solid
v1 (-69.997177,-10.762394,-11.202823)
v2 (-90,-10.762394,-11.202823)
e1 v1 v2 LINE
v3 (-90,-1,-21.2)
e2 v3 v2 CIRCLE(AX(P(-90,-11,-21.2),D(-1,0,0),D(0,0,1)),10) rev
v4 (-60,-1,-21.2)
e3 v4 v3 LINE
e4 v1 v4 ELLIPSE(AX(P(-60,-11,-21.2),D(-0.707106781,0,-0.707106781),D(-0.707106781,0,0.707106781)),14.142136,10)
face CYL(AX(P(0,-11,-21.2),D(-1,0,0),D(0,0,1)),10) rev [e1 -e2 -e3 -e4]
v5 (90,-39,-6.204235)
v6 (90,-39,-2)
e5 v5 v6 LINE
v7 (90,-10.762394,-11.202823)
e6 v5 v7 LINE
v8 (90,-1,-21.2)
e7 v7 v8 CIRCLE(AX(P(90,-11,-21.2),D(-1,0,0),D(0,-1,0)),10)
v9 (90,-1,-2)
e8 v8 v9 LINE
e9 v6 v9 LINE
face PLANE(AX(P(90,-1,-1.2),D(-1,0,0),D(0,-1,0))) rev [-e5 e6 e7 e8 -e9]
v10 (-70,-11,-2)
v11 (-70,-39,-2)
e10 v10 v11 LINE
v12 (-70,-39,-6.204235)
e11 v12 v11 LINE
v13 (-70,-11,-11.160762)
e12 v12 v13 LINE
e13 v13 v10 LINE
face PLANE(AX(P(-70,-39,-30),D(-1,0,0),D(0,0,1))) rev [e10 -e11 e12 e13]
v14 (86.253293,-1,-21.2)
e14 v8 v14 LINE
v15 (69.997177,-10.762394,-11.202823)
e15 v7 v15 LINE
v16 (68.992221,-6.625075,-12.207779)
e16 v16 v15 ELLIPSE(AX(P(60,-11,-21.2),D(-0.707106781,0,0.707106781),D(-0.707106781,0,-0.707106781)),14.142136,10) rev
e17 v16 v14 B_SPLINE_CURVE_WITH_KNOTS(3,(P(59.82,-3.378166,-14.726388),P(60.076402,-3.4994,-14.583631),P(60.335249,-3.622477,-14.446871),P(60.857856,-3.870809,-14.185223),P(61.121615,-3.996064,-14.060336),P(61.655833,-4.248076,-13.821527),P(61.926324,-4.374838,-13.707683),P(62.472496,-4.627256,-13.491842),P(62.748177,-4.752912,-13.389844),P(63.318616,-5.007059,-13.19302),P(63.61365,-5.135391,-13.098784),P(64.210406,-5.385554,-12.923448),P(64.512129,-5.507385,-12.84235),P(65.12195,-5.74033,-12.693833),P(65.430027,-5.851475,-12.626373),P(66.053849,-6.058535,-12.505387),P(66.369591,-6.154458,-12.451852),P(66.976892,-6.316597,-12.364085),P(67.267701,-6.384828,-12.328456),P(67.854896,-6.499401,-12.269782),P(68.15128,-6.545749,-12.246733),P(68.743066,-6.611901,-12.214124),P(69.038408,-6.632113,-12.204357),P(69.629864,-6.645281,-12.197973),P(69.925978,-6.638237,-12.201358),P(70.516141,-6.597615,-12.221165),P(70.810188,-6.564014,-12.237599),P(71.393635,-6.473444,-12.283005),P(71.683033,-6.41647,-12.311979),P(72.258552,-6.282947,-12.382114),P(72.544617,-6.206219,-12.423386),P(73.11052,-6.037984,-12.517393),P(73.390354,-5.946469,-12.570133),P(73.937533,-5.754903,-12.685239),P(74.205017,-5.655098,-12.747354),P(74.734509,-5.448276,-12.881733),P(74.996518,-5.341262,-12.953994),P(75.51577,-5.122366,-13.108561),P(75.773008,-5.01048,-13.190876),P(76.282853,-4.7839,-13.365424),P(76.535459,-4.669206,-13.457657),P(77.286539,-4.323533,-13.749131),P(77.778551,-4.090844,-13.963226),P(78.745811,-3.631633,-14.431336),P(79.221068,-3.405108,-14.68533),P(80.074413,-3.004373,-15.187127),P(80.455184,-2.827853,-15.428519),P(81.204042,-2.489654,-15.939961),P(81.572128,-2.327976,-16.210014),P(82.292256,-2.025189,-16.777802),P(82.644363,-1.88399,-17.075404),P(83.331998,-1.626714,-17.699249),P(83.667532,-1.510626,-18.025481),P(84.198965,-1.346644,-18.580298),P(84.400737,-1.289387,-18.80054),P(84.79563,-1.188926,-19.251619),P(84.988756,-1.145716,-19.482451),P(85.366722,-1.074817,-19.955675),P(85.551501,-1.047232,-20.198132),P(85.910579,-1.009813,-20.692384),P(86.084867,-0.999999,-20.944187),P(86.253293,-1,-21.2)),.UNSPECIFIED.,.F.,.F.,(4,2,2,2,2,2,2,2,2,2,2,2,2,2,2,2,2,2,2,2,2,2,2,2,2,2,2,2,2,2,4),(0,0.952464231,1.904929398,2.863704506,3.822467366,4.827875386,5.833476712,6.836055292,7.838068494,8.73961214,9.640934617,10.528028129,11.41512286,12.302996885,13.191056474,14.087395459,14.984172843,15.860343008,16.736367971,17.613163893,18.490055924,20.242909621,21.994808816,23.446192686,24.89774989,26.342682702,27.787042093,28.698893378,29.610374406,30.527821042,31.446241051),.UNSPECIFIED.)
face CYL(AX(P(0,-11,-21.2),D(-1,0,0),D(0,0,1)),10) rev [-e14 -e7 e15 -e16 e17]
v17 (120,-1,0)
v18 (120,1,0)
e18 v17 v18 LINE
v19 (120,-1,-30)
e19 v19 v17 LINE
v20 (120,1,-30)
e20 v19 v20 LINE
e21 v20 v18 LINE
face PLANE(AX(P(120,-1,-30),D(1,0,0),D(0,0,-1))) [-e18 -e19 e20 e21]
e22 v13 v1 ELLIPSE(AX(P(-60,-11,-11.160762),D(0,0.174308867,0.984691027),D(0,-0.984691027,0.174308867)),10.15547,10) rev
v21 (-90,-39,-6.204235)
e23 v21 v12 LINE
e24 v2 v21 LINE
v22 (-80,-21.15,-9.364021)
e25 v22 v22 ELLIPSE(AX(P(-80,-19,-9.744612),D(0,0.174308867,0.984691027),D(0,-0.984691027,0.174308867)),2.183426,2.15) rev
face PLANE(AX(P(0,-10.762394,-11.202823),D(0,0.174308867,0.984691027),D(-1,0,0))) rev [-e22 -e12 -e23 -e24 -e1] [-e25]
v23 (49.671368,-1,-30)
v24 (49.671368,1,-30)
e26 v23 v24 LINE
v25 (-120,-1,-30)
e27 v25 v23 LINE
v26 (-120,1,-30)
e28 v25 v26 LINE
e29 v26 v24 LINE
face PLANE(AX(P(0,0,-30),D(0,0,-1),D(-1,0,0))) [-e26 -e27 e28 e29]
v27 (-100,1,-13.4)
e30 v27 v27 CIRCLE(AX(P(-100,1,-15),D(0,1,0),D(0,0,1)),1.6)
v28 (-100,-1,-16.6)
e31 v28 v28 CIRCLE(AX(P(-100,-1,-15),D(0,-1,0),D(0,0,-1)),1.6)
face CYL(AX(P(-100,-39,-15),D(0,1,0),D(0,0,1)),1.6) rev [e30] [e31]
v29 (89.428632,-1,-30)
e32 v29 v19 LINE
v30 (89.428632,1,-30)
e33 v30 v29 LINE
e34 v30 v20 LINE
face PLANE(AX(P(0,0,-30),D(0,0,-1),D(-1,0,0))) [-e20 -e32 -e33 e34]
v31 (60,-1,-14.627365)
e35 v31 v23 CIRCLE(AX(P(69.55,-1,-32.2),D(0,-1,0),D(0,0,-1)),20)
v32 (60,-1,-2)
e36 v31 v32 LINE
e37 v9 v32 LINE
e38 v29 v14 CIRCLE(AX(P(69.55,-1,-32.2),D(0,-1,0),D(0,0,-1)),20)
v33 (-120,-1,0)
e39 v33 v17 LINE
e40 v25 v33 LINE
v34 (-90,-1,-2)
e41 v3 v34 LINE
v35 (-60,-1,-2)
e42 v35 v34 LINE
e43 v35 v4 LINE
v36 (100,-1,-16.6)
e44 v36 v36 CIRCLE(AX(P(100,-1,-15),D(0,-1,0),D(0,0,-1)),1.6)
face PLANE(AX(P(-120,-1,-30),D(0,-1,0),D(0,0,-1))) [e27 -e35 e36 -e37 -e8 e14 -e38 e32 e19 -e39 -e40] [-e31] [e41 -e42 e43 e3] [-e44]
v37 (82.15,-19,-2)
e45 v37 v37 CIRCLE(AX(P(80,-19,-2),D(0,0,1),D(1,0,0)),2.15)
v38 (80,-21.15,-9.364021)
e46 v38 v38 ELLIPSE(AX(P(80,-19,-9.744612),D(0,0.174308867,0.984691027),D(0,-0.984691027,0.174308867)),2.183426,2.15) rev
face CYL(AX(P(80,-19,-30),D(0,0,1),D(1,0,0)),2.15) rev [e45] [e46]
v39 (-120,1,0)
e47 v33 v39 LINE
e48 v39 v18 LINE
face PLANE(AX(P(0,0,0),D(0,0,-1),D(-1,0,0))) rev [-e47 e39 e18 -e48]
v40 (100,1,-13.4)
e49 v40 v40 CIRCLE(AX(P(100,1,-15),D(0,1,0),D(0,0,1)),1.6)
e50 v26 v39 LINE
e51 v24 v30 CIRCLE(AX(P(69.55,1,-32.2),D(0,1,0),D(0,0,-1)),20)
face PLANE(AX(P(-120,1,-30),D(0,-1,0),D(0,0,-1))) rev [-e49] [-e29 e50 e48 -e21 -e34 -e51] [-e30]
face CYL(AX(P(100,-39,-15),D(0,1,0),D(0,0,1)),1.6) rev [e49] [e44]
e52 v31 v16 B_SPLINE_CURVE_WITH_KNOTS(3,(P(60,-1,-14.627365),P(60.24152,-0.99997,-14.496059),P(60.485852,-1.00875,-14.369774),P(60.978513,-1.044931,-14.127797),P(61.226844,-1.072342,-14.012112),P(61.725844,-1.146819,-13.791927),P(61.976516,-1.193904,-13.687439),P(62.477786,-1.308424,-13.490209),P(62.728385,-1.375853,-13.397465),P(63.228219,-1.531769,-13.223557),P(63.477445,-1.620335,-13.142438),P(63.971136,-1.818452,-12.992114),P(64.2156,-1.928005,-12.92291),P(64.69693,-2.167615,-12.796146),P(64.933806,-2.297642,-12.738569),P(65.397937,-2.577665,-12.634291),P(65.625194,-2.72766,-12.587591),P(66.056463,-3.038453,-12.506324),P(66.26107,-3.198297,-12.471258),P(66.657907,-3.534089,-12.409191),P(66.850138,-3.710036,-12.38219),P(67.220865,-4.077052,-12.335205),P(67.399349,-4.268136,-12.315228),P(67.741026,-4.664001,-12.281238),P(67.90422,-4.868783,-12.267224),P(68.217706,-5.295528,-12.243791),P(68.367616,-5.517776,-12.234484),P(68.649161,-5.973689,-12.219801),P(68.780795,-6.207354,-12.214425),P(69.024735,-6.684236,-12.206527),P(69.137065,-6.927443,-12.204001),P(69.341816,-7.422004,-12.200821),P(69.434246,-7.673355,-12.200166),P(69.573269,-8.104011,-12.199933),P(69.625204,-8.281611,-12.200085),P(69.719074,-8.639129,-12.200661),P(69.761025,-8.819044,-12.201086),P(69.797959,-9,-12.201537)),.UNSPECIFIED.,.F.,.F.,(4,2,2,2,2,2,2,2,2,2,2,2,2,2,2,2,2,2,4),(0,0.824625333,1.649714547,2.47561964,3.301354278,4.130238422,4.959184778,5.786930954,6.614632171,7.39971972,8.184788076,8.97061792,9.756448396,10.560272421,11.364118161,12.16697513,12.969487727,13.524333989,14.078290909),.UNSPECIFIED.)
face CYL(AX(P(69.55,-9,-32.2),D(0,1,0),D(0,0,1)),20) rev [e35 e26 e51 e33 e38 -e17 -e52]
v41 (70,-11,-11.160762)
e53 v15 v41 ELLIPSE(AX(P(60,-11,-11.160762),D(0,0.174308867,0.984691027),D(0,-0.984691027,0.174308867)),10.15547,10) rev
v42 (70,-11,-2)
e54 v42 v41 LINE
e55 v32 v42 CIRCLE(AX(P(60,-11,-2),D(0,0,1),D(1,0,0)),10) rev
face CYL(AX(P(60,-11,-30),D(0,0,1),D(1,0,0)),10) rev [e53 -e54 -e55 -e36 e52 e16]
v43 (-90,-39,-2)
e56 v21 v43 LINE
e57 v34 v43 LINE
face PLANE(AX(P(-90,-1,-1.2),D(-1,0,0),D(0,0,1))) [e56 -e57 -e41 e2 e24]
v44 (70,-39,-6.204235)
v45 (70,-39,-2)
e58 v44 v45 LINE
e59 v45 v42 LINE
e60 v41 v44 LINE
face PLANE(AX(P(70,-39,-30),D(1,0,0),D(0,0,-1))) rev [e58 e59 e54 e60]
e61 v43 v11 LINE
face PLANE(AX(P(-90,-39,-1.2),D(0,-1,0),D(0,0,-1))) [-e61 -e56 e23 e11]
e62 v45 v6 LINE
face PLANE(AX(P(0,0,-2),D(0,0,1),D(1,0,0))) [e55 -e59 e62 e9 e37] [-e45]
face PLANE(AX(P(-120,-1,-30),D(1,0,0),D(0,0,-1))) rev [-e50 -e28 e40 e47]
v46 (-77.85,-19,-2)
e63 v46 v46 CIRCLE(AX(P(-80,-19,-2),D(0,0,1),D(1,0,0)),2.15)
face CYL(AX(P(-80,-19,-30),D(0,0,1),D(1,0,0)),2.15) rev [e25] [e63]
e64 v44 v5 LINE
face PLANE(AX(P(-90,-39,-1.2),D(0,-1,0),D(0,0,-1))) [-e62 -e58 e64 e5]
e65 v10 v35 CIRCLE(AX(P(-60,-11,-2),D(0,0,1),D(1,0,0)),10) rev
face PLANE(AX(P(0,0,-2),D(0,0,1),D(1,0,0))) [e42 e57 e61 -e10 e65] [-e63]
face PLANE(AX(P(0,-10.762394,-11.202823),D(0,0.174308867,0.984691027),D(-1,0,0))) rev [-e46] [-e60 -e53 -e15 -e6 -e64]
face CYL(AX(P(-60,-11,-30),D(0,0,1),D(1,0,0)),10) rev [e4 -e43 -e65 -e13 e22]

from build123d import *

# Parameters (mm, degrees)
ESQUISSE1_W             = 240
ESQUISSE1_H             = 2
BOSS_EXTRU_1_DEPTH      = 30
ESQUISSE1_3_W           = 180
ESQUISSE1_3_H           = 38
BOSS_EXTRU_2_DEPTH      = 1.2
ESQUISSE2_R             = 1.6
ENL_V_MAT_EXTRU_1_DEPTH = 131
ESQUISSE3_W             = 180
ESQUISSE3_H             = 38
BOSS_EXTRU_3_DEPTH      = 10
ESQUISSE4_W             = 180
ESQUISSE4_H             = 38
ENL_V_MAT_EXTRU_2_DEPTH = 2
ESQUISSE5_W             = 140
ESQUISSE5_H             = 38
ENL_V_MAT_EXTRU_3_DEPTH = 130.247823966
CONG_1_R                = 10
CHANFREIN1_START        = -21.049758641
CHANFREIN1_DEPTH        = 8.142458431
ESQUISSE6_R             = 2.15
ENL_V_MAT_EXTRU_4_DEPTH = 130.247823996
ESQUISSE9_R             = 20
ENL_V_MAT_EXTRU_6_DEPTH = 10


with BuildPart() as part:
    # Esquisse1 → Boss.-Extru.1 (new body)
    with BuildSketch(Plane.XY):
        Rectangle(ESQUISSE1_W, ESQUISSE1_H)
    extrude(amount=-BOSS_EXTRU_1_DEPTH)

    # Esquisse1<3> → Boss.-Extru.2 (add)
    with BuildSketch(Plane.XY):
        with Locations((0, -20)):
            Rectangle(ESQUISSE1_3_W, ESQUISSE1_3_H)
    extrude(amount=-BOSS_EXTRU_2_DEPTH)

    # Esquisse2 → Enlèv. mat.-Extru.1 (cut, through all)
    with BuildSketch(Plane(origin=(0, 1, 0), x_dir=(1, 0, 0), z_dir=(0, 1, 0))):
        with Locations(Location((-100, 15, 0), (0, 0, 270))):
            Circle(ESQUISSE2_R)
        with Locations(Location((100, 15, 0), (0, 0, 270))):
            Circle(ESQUISSE2_R)
    extrude(amount=-ENL_V_MAT_EXTRU_1_DEPTH, mode=Mode.SUBTRACT)

    # Esquisse3 → Boss.-Extru.3 (add)
    with BuildSketch(Plane(origin=(0, 0, -1.2), x_dir=(-1, 0, 0), z_dir=(0, 0, -1))):
        with Locations((0, -20)):
            Rectangle(ESQUISSE3_W, ESQUISSE3_H)
    extrude(amount=BOSS_EXTRU_3_DEPTH)

    # Esquisse4 → Enlèv. mat.-Extru.2 (cut)
    with BuildSketch(Plane.XY):
        with Locations((0, -20)):
            Rectangle(ESQUISSE4_W, ESQUISSE4_H)
    extrude(amount=-ENL_V_MAT_EXTRU_2_DEPTH, mode=Mode.SUBTRACT)

    # Esquisse5 → Enlèv. mat.-Extru.3 (cut, through all)
    with BuildSketch(Plane.XY.offset(-2)):
        with Locations((0, -20)):
            Rectangle(ESQUISSE5_W, ESQUISSE5_H)
    extrude(amount=-ENL_V_MAT_EXTRU_3_DEPTH, mode=Mode.SUBTRACT)

    # Congé1
    cong_1_edges = [part.edges().sort_by_distance(p)[0] for p in [
        (-80, -1, -11.2),
        (80, -1, -11.2),
        (70, -1, -6.6),
        (-70, -1, -6.6),
    ]]
    fillet(cong_1_edges, radius=CONG_1_R)

    # Chanfrein1: read off the stored shape, not the designer's step
    # Chanfrein1 outline → Chanfrein1 (cut)
    with BuildSketch(Plane(origin=(0, 0, 0), x_dir=(1, 0, 0), z_dir=(0, 0.17430886736371906, 0.9846910270528403)).offset(CHANFREIN1_START)):
        with BuildLine():
            Line((-70, -37.321496906), (-70, -8.886181431))
            add(Edge.make_bspline(
                [(-69.997176769, -8.644881308), (-70, -8.765514336), (-70, -8.886181431)],
                knots=[4.688626138, 4.688626138, 4.688626138, 4.71238898, 4.71238898, 4.71238898], degree=2, weights=[1, 0.999929417, 1]))
            Line((-69.997176769, -8.644881308), (-90, -8.644881308))
            Line((-90, -8.644881308), (-90, -37.321496906))
            Line((-90, -37.321496906), (-70, -37.321496906))
        make_face()
        with BuildLine():
            Line((90, -37.321496906), (90, -8.644881308))
            Line((90, -8.644881308), (69.997176769, -8.644881308))
            add(Edge.make_bspline(
                [(70, -8.886181431), (70, -8.765514336), (69.997176769, -8.644881308)],
                knots=[1.570796327, 1.570796327, 1.570796327, 1.59455917, 1.59455917, 1.59455917], degree=2, weights=[1, 0.999929417, 1]))
            Line((70, -8.886181431), (70, -37.321496906))
            Line((70, -37.321496906), (90, -37.321496906))
        make_face()
    extrude(amount=CHANFREIN1_DEPTH, mode=Mode.SUBTRACT)

    # Esquisse6 → Enlèv. mat.-Extru.4 (cut, through all)
    with BuildSketch(Plane.XY.offset(-2)):
        with Locations((80, -19)):
            Circle(ESQUISSE6_R)
        with Locations((-80, -19)):
            Circle(ESQUISSE6_R)
    extrude(amount=-ENL_V_MAT_EXTRU_4_DEPTH, mode=Mode.SUBTRACT)

    # Esquisse9 → Enlèv. mat.-Extru.6 (cut)
    with BuildSketch(Plane(origin=(0, 1, 0), x_dir=(1, 0, 0), z_dir=(0, 1, 0))):
        with Locations((69.55, 32.2)):
            Circle(ESQUISSE9_R)
    extrude(amount=-ENL_V_MAT_EXTRU_6_DEPTH, mode=Mode.SUBTRACT)


solid = part.part
